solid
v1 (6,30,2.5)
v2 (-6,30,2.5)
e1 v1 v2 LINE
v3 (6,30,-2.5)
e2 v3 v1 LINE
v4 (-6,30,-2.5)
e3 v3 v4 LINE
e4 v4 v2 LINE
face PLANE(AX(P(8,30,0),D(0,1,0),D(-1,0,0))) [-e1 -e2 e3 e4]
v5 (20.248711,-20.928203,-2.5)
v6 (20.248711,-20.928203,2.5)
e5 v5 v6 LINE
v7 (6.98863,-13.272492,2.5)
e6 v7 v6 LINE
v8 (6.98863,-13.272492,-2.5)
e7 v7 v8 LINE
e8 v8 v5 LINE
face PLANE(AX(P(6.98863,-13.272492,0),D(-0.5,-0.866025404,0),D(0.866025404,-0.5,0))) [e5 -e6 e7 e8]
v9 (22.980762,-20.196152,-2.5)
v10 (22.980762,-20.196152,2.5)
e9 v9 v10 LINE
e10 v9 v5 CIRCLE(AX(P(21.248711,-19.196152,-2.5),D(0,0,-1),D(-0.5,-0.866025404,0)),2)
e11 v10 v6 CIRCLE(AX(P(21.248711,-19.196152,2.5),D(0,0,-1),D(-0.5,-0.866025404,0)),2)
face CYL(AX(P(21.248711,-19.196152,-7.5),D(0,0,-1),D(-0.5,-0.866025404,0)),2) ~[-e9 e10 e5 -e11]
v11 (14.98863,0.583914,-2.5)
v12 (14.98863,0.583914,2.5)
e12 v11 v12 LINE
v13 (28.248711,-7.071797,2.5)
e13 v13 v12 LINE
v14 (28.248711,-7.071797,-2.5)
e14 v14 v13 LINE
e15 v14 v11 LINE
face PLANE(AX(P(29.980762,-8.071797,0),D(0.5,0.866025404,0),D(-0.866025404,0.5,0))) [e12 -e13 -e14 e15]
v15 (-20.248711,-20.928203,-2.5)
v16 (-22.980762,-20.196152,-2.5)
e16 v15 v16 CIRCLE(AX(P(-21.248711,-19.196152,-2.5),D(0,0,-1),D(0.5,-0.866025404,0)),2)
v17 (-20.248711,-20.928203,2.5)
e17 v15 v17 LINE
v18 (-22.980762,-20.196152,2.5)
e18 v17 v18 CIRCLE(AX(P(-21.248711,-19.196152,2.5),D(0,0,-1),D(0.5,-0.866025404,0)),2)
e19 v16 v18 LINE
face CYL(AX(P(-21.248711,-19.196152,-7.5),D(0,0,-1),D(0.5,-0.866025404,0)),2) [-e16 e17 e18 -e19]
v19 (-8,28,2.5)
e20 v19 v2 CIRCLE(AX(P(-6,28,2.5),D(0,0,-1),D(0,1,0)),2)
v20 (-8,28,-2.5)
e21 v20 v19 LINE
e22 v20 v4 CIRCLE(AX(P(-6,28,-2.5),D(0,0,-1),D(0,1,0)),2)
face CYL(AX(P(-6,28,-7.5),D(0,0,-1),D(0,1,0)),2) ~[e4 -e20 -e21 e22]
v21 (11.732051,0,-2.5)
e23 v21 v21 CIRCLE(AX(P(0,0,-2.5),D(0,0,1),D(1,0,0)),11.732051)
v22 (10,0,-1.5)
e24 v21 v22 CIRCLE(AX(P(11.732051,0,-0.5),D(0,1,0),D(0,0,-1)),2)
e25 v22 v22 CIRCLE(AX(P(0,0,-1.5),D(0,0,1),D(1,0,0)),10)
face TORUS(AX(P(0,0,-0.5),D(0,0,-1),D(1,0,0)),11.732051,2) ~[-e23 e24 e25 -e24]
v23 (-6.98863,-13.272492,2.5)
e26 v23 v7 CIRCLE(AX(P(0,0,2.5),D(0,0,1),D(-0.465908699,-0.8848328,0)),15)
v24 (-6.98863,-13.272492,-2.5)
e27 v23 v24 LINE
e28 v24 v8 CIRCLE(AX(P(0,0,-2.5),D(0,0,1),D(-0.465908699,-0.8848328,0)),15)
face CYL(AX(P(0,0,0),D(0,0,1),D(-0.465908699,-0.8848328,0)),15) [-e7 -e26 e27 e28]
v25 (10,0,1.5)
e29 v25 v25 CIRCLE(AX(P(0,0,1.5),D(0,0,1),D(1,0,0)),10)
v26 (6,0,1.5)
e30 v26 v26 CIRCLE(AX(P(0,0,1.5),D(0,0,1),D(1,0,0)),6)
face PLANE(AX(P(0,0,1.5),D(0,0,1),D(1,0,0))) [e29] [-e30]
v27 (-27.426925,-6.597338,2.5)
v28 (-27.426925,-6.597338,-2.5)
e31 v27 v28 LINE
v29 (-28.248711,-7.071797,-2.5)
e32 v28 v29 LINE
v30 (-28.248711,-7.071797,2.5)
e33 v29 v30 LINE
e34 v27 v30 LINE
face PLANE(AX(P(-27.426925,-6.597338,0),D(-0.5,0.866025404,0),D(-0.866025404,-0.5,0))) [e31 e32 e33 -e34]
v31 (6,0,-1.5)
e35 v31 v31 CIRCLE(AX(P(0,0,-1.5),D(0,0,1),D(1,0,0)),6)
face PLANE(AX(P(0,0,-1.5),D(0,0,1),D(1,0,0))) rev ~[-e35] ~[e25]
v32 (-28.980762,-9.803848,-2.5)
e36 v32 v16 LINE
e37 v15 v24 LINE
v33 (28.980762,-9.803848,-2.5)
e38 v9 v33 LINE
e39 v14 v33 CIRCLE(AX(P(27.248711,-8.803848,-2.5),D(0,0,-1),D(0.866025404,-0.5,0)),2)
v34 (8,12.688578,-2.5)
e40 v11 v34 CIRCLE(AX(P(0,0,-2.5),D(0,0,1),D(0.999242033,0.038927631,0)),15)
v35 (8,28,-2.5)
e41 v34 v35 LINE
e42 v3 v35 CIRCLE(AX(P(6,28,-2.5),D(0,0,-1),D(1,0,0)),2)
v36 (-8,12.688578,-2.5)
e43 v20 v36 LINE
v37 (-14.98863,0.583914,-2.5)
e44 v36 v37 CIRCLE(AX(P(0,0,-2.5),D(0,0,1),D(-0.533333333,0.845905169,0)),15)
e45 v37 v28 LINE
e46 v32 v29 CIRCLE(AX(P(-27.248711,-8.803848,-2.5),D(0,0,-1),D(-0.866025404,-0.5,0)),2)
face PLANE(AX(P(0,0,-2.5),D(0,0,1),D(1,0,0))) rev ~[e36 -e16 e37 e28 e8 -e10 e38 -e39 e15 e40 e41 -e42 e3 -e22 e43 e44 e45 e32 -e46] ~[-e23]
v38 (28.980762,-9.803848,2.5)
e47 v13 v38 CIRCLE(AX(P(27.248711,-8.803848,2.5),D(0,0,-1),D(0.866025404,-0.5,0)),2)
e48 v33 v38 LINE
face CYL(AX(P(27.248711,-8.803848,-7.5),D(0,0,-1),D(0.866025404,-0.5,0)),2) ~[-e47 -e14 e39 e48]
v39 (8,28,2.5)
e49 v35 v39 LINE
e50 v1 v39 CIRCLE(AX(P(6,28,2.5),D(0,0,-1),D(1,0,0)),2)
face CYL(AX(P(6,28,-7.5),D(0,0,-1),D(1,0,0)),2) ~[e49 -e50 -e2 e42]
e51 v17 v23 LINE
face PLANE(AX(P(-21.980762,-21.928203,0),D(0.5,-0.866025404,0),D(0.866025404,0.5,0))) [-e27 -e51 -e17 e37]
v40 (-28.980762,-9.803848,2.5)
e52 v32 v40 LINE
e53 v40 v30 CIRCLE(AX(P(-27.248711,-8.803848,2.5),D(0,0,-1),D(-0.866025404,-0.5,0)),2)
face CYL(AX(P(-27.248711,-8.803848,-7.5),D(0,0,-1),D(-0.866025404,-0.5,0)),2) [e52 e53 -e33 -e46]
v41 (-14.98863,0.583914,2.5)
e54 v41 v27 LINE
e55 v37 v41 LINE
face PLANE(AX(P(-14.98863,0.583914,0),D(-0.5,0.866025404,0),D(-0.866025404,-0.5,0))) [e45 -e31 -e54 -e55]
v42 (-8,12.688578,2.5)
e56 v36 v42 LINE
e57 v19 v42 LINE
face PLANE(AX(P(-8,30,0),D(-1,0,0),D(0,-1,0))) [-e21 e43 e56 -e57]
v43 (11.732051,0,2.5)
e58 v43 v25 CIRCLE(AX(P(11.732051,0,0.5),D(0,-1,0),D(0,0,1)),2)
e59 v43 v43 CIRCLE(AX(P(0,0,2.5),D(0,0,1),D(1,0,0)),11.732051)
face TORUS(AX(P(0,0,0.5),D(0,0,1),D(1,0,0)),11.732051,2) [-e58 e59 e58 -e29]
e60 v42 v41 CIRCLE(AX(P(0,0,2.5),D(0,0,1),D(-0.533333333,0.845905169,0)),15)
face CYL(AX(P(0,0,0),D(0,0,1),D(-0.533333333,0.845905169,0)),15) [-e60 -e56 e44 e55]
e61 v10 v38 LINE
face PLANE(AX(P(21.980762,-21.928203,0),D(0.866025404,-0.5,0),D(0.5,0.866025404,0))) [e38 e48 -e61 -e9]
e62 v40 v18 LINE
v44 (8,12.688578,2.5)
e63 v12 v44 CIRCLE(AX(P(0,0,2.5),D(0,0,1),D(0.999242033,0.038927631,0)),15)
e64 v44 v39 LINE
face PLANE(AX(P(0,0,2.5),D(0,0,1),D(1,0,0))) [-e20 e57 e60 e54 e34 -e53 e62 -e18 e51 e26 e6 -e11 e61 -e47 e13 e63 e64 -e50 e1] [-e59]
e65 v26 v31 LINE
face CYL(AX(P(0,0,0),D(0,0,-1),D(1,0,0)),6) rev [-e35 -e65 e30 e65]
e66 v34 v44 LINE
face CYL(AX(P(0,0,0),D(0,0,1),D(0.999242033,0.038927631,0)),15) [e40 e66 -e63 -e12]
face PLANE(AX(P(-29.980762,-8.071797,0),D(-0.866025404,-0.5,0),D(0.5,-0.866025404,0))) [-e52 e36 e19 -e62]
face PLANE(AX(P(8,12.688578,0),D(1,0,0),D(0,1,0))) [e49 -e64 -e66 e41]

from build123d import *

# Parameters (mm, degrees)
F0_R        = 10
F1_DEPTH    = 2.5
F0_R_2      = 6
F2_DEPTH    = 1.5
F3_T1_DEPTH = 15


# Not quite as in the source:
# - a fillet or chamfer that OpenCascade refuses, or shapes differently, is made with other operations: its cross-section is extruded or revolved along the edge and cut away or added


with BuildPart() as f1:
    # F0 (on Top) → F1 (new body, symmetric)
    with BuildSketch(Plane.XY):
        with BuildLine():
            Line((25.9807621135, -15), (29.9807621135, -8.0717967697))
            Line((29.9807621135, -8.0717967697), (14.9886304879, 0.5839144601))
            ThreePointArc((14.9886304879, 0.5839144601), (12.9903810568, 7.5), (8, 12.6885775404))
            Line((8, 12.6885775404), (8, 30))
            Line((8, 30), (-8, 30))
            Line((-8, 30), (-8, 12.6885775404))
            ThreePointArc((-8, 12.6885775404), (-12.9903810568, 7.5), (-14.9886304879, 0.5839144601))
            Line((-14.9886304879, 0.5839144601), (-27.4269246123, -6.5973380009))
            Line((-27.4269246123, -6.5973380009), (-29.9807621135, -8.0717967697))
            Line((-29.9807621135, -8.0717967697), (-21.9807621135, -21.9282032303))
            Line((-21.9807621135, -21.9282032303), (-6.9886304879, -13.2724920005))
            ThreePointArc((-6.9886304879, -13.2724920005), (0, -15), (6.9886304879, -13.2724920005))
            Line((6.9886304879, -13.2724920005), (21.9807621135, -21.9282032303))
            Line((21.9807621135, -21.9282032303), (25.9807621135, -15))
        make_face()
        Circle(F0_R, mode=Mode.SUBTRACT)
    extrude(amount=F1_DEPTH, both=True)

    # F0 (on Top) → F2 (join, symmetric)
    with BuildSketch(Plane.XY):
        Circle(F0_R)
        Circle(F0_R_2, mode=Mode.SUBTRACT)
    extrude(amount=F2_DEPTH, both=True)

    # F3: fillet of radius 2 on 8 edges, made by hand

    # F3_s2 → F3_t1 (cut)
    with BuildSketch(Plane.XY.offset(-7.5)):
        with BuildLine():
            ThreePointArc((-28.9807621135, -9.8038475773), (-29.1805629585, -8.2862094871), (-28.248711306, -7.0717967697))
            Line((-28.248711306, -7.0717967697), (-29.9807621135, -8.0717967697))
            Line((-29.9807621135, -8.0717967697), (-28.9807621135, -9.8038475773))
        make_face()
        with BuildLine():
            ThreePointArc((-20.248711306, -20.9282032303), (-21.7663493962, -21.1280040753), (-22.9807621135, -20.1961524227))
            Line((-22.9807621135, -20.1961524227), (-21.9807621135, -21.9282032303))
            Line((-21.9807621135, -21.9282032303), (-20.248711306, -20.9282032303))
        make_face()
        with BuildLine():
            ThreePointArc((20.248711306, -20.9282032303), (21.7663493962, -21.1280040753), (22.9807621135, -20.1961524227))
            Line((22.9807621135, -20.1961524227), (21.9807621135, -21.9282032303))
            Line((21.9807621135, -21.9282032303), (20.248711306, -20.9282032303))
        make_face()
        with BuildLine():
            ThreePointArc((28.9807621135, -9.8038475773), (29.1805629585, -8.2862094871), (28.248711306, -7.0717967697))
            Line((28.248711306, -7.0717967697), (29.9807621135, -8.0717967697))
            Line((29.9807621135, -8.0717967697), (28.9807621135, -9.8038475773))
        make_face()
        with BuildLine():
            ThreePointArc((8, 28), (7.4142135624, 29.4142135624), (6, 30))
            Line((6, 30), (8, 30))
            Line((8, 30), (8, 28))
        make_face()
        with BuildLine():
            ThreePointArc((-6, 30), (-7.4142135624, 29.4142135624), (-8, 28))
            Line((-8, 28), (-8, 30))
            Line((-8, 30), (-6, 30))
        make_face()
    extrude(amount=F3_T1_DEPTH, mode=Mode.SUBTRACT)

    # F3_s3 → F3_t4 (revolve, cut)
    with BuildSketch(Plane.XZ):
        with BuildLine():
            ThreePointArc((11.7320508076, 2.5), (10.7320508076, 2.2320508076), (10, 1.5))
            Line((10, 1.5), (10, 2.5))
            Line((10, 2.5), (11.7320508076, 2.5))
        make_face()
    revolve(axis=Axis((0, 0, 2.5), (0, 0, 1)), mode=Mode.SUBTRACT)

    # F3_s5 → F3_t6 (revolve, cut)
    with BuildSketch(Plane.XZ):
        with BuildLine():
            ThreePointArc((11.7320508076, -2.5), (10.7320508076, -2.2320508076), (10, -1.5))
            Line((10, -1.5), (10, -2.5))
            Line((10, -2.5), (11.7320508076, -2.5))
        make_face()
    revolve(axis=Axis((0, 0, -2.5), (0, 0, 1)), mode=Mode.SUBTRACT)


solid = f1.part
